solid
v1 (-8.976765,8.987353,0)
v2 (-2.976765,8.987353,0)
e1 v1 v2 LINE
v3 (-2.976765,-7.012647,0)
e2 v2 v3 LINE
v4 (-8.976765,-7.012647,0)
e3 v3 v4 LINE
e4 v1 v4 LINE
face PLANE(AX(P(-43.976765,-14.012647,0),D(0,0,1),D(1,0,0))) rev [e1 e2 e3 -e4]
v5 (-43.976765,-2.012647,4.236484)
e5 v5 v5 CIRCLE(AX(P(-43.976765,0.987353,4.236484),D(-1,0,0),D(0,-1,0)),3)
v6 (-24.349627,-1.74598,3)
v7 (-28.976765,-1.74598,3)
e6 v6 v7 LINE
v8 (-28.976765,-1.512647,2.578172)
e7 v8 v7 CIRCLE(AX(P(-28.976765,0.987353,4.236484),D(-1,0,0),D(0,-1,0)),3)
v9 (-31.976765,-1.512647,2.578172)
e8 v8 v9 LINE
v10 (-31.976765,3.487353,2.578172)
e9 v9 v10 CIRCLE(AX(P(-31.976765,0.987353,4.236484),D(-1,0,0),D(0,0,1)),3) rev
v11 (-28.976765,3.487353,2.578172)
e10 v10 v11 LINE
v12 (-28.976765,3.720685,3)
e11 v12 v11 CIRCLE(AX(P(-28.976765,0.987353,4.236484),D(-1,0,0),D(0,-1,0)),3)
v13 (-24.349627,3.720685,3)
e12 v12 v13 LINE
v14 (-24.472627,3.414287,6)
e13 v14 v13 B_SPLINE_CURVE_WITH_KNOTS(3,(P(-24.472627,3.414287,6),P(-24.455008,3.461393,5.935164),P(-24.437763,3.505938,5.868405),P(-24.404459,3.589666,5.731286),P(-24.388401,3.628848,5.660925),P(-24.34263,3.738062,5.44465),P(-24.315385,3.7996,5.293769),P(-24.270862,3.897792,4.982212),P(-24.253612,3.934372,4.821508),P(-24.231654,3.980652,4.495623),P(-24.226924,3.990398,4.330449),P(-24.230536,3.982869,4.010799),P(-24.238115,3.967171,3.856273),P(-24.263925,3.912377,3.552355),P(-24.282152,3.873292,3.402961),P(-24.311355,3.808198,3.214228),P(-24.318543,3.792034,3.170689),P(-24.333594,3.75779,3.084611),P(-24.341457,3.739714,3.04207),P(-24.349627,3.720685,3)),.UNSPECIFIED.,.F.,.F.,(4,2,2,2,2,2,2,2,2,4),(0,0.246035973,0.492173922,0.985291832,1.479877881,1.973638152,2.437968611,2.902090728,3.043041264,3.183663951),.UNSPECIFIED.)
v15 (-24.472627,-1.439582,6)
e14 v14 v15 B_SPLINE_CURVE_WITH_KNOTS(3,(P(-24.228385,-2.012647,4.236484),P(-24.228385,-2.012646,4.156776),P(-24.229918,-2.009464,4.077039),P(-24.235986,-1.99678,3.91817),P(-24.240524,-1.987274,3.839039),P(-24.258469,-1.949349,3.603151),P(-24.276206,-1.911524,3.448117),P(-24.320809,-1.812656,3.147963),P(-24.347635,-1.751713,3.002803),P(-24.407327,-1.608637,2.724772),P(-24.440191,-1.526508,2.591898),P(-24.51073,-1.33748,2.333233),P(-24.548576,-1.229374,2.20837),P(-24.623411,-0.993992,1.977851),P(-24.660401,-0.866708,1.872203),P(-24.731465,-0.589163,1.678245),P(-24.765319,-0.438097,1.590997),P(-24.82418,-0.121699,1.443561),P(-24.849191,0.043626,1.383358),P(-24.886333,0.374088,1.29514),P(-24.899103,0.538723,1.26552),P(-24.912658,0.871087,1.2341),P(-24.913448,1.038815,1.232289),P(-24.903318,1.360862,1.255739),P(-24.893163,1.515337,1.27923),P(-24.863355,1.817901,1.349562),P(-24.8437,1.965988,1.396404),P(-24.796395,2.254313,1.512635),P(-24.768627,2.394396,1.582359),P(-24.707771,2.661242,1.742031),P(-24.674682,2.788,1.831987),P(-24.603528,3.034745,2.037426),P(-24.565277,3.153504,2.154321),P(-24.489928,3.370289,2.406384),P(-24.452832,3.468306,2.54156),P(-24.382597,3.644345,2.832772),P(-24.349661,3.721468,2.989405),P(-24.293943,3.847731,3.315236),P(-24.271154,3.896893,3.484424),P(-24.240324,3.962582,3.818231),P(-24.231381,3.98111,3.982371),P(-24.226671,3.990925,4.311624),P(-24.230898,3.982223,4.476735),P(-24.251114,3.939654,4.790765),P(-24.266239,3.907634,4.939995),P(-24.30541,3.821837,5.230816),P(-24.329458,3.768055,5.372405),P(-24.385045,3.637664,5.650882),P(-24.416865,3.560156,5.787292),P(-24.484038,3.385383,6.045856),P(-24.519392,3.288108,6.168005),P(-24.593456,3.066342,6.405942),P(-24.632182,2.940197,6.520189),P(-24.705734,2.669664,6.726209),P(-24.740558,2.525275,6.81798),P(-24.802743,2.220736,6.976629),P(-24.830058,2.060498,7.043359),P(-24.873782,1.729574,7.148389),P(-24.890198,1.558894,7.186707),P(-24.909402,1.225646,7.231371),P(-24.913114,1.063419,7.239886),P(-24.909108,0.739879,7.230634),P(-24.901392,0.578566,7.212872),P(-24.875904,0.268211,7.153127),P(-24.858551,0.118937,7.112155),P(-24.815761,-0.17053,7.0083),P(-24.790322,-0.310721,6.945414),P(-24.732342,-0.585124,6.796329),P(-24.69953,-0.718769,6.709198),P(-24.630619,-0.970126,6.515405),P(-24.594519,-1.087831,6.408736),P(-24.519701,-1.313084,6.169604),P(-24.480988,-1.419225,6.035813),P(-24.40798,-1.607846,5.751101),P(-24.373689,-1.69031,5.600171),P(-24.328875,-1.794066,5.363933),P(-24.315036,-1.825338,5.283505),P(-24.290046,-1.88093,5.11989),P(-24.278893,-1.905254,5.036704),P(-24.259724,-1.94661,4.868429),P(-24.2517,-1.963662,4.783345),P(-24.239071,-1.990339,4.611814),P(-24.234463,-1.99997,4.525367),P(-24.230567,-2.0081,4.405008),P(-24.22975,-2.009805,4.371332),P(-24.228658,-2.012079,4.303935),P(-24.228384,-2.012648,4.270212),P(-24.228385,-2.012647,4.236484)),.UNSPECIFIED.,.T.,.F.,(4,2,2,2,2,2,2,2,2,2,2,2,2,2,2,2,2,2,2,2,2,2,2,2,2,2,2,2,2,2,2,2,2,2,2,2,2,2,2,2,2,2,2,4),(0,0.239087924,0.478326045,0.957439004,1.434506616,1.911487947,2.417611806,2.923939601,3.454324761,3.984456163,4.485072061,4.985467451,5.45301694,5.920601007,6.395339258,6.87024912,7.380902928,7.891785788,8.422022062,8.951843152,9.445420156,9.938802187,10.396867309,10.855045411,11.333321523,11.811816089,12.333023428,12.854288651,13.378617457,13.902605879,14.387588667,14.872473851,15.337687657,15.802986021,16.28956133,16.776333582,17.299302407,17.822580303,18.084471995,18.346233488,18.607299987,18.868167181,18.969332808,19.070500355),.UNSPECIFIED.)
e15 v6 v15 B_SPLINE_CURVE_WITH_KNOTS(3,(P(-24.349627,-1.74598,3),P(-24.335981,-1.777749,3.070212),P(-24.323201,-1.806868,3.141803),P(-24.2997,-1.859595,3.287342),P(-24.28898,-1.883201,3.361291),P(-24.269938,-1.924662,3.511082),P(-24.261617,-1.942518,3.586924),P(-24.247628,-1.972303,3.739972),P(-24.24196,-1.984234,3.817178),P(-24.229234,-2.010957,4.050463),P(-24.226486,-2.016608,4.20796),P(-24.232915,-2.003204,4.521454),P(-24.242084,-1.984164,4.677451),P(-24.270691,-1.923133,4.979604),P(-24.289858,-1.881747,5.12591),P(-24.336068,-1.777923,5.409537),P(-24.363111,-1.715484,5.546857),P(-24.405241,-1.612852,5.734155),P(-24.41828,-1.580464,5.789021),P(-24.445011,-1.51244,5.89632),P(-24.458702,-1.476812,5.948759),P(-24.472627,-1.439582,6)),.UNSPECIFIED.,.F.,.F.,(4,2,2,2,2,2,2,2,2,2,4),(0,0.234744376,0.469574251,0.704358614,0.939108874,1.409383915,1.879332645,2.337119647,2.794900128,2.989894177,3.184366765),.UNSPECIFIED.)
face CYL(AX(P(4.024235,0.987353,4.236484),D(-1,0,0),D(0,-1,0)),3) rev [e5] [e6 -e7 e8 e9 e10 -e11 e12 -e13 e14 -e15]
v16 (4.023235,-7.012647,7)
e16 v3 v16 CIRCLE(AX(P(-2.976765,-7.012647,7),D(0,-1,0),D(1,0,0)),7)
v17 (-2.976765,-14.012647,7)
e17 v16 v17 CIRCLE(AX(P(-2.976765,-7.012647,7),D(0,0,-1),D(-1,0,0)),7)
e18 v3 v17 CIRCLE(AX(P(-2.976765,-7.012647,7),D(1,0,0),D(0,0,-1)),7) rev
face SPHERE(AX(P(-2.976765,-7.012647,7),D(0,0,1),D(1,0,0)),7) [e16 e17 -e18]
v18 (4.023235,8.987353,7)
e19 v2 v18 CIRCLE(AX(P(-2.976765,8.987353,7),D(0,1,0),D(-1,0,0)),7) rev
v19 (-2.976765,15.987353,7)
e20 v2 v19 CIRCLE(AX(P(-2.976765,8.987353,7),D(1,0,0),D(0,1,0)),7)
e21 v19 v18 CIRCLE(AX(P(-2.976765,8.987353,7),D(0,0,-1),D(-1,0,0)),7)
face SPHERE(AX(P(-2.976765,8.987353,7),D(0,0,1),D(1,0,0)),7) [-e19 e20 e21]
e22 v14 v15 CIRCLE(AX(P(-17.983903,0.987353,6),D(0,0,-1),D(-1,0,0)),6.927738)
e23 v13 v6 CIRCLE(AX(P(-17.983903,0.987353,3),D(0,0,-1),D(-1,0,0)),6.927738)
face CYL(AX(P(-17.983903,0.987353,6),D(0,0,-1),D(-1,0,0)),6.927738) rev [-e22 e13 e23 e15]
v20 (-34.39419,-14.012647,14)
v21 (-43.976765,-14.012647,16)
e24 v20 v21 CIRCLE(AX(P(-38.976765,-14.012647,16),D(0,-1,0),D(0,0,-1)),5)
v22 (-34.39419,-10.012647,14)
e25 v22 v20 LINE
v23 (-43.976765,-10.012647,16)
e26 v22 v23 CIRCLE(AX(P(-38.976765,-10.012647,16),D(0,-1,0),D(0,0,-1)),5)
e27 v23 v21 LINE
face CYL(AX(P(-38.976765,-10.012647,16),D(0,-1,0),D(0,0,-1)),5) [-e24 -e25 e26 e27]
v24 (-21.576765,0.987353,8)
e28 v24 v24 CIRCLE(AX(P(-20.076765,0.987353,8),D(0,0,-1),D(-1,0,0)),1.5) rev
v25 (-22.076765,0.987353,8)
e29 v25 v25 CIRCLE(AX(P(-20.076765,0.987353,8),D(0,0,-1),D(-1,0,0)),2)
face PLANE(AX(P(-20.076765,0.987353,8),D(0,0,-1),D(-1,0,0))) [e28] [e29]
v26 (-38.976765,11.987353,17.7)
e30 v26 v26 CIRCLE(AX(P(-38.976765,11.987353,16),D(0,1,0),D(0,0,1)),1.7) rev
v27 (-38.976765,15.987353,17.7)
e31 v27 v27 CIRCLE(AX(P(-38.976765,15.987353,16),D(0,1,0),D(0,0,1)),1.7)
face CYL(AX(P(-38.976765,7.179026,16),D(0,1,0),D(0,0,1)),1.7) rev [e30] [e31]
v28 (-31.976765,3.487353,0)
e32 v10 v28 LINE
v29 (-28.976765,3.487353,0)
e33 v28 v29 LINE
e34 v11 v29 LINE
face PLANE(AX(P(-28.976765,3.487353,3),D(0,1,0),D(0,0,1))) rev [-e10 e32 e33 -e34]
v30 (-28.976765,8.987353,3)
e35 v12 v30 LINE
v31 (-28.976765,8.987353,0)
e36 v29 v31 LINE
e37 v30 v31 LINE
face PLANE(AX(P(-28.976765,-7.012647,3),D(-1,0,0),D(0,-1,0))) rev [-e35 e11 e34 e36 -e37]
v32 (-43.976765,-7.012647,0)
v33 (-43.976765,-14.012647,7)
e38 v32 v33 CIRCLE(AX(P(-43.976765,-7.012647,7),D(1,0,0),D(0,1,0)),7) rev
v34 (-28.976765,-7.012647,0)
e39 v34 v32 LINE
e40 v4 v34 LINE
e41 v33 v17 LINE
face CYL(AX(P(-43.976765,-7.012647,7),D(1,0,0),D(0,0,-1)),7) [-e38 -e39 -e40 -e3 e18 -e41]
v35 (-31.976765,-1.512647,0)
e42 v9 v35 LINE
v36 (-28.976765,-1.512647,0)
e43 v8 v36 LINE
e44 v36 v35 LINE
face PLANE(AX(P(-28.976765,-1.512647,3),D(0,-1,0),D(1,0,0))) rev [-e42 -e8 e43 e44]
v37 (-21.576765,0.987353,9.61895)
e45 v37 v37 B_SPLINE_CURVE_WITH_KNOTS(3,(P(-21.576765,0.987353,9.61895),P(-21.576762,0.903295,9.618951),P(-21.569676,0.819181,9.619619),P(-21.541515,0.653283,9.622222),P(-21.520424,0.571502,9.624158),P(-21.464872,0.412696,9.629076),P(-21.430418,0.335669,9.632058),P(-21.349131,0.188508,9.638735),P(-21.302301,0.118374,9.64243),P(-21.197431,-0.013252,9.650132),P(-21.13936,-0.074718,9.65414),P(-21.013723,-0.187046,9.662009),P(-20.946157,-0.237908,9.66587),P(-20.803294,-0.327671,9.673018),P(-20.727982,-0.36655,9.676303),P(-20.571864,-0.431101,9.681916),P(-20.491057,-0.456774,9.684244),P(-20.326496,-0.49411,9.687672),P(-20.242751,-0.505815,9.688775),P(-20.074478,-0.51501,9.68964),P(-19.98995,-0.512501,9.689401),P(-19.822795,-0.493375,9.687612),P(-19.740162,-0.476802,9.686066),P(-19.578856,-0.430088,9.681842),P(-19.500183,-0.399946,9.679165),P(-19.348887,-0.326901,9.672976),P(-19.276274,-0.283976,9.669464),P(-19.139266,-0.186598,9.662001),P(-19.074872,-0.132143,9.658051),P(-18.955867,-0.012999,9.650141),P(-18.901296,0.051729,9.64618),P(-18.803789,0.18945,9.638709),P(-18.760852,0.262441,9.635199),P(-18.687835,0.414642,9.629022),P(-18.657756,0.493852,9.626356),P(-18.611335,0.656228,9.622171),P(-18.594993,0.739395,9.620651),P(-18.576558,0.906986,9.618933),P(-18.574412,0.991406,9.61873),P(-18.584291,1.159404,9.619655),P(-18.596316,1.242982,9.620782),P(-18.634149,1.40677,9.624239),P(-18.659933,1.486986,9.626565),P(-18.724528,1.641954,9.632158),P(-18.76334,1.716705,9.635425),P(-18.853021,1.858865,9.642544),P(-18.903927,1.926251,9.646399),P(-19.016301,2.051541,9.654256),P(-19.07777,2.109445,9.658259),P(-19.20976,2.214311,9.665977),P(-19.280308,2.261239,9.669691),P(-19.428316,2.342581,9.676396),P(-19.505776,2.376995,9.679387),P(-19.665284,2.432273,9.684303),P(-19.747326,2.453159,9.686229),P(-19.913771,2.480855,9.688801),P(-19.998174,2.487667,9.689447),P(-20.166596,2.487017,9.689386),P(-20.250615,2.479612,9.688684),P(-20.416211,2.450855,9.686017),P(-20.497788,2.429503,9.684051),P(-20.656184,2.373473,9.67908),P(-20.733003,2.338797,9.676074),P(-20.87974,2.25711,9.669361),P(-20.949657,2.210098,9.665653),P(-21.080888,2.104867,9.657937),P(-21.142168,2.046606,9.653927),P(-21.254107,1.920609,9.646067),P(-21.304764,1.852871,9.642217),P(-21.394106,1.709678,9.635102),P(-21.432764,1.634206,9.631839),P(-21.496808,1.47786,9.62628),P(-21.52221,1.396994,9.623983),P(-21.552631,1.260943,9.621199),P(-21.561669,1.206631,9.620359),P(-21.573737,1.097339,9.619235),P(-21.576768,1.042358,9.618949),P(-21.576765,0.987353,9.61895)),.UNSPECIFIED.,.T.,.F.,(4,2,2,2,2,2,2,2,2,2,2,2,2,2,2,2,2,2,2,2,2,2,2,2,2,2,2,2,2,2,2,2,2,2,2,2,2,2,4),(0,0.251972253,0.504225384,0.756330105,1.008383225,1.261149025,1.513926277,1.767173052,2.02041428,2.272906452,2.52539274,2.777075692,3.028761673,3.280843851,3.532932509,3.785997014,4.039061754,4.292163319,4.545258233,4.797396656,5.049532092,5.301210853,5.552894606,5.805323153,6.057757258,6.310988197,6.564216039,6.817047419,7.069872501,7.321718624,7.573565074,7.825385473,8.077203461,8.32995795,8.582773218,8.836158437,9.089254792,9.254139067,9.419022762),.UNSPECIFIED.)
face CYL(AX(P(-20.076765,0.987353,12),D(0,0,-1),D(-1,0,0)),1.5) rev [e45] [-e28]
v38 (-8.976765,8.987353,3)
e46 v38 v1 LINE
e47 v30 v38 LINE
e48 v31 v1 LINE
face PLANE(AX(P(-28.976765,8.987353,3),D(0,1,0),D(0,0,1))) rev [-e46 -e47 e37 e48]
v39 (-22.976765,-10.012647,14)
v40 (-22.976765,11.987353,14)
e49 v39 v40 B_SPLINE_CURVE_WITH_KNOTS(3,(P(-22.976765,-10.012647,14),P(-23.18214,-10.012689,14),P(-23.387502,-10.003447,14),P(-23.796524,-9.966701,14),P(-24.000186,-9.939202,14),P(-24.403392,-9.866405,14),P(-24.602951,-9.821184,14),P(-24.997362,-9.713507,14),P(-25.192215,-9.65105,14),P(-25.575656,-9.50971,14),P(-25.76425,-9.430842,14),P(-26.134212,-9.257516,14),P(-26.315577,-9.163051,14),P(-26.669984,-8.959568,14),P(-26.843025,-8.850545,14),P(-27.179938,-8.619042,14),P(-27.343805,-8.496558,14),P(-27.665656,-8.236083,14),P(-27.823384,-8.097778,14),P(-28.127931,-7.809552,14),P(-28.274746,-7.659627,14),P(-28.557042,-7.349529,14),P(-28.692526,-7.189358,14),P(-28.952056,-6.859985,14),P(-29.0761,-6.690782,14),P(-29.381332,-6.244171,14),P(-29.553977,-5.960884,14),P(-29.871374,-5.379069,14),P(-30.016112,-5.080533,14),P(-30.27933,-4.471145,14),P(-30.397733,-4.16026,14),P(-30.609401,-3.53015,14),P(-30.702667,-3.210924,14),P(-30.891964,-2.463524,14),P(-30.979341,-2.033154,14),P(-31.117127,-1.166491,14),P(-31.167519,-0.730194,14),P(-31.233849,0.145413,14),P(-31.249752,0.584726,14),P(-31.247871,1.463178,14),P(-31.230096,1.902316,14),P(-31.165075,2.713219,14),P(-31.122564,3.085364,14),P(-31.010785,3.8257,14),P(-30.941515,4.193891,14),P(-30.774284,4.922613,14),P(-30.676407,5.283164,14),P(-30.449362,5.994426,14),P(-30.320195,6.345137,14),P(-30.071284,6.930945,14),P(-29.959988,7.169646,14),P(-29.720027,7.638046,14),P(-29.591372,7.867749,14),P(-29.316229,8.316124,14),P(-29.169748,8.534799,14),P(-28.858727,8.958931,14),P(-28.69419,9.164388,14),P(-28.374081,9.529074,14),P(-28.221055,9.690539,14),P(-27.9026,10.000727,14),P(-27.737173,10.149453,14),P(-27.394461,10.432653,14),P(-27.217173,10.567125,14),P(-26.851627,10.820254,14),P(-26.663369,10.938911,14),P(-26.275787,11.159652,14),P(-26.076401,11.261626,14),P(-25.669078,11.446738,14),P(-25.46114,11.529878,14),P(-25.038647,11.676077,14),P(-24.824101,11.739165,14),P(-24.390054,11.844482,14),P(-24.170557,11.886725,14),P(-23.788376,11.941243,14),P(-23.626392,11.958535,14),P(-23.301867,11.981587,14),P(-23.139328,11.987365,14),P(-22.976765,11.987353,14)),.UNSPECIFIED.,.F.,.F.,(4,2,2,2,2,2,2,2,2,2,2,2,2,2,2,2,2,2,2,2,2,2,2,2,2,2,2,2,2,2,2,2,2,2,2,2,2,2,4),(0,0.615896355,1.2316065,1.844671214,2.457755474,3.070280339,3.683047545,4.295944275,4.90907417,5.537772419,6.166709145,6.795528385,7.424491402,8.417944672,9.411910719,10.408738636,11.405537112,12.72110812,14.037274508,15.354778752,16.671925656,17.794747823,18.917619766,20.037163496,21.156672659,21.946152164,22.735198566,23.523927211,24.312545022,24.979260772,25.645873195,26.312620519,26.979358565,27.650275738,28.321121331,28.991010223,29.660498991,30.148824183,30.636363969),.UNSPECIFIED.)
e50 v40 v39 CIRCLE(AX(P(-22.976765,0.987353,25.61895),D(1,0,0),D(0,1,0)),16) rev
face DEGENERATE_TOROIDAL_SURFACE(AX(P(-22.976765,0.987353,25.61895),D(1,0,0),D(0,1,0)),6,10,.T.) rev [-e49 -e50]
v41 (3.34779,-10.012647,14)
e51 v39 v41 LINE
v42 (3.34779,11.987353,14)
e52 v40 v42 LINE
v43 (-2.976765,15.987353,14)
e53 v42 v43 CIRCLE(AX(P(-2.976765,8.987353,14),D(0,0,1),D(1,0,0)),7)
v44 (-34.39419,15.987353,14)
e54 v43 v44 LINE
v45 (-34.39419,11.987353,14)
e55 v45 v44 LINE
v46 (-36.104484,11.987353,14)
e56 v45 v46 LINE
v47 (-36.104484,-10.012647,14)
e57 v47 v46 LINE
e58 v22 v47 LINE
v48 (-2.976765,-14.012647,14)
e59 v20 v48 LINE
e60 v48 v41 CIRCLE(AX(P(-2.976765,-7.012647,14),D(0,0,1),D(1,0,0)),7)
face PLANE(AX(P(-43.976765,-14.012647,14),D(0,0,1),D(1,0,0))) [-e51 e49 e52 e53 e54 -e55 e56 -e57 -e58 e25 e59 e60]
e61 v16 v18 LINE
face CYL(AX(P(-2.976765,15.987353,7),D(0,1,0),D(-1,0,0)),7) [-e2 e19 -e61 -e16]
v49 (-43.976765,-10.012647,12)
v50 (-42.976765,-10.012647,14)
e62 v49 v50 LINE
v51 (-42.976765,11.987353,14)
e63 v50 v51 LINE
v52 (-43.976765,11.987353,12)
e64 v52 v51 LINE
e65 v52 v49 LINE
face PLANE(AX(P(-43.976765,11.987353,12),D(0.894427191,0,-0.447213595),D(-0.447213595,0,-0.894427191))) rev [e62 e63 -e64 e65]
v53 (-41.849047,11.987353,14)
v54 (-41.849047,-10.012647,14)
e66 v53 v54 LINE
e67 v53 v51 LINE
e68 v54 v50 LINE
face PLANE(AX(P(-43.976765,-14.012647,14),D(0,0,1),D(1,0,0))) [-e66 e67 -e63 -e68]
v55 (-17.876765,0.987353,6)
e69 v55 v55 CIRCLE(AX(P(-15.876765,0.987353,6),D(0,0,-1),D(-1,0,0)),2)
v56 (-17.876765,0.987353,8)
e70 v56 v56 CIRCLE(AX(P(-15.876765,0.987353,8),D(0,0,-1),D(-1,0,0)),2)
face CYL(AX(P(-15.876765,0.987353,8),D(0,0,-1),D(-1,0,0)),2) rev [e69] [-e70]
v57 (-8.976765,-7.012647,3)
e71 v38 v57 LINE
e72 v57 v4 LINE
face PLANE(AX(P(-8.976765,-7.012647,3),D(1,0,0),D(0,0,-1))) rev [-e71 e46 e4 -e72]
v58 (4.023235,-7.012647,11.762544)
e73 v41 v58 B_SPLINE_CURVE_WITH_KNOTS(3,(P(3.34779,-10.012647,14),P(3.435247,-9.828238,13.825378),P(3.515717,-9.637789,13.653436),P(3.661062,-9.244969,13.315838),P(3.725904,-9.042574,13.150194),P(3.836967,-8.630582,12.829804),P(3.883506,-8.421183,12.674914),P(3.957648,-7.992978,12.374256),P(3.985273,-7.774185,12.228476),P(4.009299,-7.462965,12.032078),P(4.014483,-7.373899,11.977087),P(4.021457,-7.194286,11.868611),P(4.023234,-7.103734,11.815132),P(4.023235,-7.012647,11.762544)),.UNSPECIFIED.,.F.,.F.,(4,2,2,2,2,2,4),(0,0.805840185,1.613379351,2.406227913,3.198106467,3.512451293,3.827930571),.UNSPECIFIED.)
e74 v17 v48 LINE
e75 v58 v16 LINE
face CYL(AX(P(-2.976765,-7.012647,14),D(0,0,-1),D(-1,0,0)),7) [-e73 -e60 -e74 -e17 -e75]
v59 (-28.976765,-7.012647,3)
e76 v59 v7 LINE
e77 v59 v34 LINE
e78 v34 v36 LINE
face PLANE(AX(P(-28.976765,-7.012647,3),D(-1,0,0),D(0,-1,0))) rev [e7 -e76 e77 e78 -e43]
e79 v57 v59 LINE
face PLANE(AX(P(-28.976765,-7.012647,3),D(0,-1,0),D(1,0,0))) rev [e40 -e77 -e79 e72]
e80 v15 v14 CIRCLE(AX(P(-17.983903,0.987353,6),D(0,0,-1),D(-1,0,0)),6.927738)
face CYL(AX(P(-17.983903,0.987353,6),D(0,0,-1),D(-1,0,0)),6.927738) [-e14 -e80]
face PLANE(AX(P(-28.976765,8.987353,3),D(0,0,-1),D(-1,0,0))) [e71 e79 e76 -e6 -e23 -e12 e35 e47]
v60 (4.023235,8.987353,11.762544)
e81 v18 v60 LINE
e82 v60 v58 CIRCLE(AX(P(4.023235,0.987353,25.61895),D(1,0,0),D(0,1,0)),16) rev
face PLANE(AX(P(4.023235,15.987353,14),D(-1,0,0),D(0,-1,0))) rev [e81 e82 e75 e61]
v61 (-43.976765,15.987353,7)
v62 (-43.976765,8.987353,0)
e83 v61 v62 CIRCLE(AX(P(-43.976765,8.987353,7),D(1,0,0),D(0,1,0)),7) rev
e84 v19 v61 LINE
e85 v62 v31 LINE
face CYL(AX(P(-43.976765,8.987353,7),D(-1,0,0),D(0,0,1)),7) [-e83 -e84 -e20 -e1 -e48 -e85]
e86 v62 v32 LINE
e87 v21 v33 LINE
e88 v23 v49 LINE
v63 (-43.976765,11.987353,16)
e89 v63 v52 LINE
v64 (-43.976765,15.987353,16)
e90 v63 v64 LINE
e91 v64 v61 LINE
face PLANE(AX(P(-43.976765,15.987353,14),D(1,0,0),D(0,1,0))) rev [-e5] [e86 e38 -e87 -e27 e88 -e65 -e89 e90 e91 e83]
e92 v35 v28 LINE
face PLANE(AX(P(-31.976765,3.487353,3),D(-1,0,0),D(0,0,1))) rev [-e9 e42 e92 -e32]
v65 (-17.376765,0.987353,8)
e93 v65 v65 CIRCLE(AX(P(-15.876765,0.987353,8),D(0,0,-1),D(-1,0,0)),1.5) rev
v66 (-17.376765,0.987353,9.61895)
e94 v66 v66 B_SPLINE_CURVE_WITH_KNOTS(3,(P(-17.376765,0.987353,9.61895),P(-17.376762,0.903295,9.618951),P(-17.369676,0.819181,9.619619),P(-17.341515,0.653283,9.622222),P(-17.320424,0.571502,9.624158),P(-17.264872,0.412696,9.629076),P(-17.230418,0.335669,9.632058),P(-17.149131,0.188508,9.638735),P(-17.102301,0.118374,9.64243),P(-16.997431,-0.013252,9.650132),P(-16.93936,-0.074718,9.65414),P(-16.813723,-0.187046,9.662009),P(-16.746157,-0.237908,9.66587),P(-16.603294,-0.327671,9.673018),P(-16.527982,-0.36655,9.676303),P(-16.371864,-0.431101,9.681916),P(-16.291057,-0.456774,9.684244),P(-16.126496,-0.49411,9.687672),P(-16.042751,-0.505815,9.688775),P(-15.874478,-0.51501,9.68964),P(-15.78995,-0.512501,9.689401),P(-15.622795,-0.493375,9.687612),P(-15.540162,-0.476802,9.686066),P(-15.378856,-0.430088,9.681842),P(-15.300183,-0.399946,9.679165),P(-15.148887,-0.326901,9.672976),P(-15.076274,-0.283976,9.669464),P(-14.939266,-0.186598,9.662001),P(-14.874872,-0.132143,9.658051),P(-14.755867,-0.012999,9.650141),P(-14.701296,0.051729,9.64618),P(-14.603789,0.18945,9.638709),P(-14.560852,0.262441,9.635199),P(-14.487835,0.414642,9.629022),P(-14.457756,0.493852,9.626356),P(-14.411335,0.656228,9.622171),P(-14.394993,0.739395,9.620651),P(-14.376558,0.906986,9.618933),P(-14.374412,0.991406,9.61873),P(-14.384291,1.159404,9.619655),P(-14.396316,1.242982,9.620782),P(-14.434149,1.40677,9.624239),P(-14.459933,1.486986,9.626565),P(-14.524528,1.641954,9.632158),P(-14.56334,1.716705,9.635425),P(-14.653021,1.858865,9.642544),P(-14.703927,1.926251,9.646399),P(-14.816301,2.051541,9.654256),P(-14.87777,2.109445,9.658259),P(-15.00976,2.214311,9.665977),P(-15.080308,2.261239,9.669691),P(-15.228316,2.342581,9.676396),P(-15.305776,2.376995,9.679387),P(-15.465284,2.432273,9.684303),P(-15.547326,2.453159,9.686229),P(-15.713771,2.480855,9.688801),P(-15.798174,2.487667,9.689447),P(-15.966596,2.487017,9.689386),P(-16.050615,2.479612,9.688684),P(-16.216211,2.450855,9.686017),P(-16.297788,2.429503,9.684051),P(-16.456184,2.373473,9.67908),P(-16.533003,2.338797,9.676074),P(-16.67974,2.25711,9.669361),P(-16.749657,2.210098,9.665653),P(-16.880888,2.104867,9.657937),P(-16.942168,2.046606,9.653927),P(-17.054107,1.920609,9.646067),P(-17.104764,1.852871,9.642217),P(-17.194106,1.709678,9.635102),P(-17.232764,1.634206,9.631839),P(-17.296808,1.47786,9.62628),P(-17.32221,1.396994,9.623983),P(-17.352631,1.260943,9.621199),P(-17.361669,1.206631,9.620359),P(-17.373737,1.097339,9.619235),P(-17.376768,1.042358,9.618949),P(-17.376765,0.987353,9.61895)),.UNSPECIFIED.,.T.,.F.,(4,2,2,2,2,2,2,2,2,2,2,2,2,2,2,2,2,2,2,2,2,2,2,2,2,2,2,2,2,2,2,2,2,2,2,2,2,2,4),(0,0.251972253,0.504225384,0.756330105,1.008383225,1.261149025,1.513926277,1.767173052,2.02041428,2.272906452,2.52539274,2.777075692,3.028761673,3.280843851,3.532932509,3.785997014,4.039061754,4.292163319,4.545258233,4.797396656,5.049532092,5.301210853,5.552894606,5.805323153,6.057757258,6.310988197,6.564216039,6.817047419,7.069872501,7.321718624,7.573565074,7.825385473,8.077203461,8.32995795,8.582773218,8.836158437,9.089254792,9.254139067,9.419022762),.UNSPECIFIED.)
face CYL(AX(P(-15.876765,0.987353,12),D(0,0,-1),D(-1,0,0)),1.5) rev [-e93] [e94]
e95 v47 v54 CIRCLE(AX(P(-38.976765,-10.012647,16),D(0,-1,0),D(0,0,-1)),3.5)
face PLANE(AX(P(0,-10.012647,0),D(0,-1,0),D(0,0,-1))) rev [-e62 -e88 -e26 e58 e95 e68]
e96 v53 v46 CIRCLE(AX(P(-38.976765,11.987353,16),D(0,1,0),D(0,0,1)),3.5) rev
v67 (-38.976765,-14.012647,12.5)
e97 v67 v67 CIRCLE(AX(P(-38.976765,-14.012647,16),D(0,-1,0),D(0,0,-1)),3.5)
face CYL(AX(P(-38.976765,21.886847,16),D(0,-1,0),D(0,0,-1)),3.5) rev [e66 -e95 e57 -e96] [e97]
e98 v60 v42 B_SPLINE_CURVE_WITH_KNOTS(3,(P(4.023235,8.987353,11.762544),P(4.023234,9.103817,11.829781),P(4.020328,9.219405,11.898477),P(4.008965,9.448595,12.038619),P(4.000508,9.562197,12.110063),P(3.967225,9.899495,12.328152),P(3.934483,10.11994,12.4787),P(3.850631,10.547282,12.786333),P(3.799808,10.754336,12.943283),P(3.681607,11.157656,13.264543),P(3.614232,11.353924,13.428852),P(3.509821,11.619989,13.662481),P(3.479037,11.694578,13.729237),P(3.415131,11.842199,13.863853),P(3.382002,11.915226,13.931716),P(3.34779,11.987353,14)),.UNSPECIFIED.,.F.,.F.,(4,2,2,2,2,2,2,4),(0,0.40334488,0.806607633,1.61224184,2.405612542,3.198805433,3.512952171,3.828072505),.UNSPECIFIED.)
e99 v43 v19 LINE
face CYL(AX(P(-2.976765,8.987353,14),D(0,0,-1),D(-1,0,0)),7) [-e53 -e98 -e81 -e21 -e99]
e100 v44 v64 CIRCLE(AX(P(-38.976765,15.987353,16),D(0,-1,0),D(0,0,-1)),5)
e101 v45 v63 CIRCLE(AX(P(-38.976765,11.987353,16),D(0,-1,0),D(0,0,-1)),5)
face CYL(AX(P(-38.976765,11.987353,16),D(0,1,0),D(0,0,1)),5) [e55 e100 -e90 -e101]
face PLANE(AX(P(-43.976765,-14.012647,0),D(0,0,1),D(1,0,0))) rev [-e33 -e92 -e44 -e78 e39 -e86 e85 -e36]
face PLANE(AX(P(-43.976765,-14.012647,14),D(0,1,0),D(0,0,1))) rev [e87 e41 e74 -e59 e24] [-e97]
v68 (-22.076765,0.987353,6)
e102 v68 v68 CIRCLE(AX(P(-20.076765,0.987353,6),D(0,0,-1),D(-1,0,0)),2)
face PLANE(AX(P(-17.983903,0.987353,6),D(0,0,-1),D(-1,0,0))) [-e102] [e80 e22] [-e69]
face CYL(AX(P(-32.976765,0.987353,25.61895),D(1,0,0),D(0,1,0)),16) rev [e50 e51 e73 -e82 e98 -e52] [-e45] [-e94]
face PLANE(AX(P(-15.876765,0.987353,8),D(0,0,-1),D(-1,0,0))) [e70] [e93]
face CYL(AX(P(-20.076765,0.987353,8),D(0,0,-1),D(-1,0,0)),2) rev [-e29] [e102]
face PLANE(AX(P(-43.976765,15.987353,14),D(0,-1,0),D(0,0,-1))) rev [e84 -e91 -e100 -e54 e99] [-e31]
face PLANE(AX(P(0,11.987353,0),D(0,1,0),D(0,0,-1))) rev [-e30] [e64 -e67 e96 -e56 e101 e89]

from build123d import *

# Parameters (mm, degrees)
CROQUIS1_W                  = 48
CROQUIS1_H                  = 30
SALIENTE_EXTRUIR1_DEPTH     = 14
CORTAR_EXTRUIR1_DEPTH       = 37
REDONDEO2_R                 = 7
CROQUIS3_W                  = 20
CROQUIS3_H                  = 16
CORTAR_EXTRUIR2_DEPTH       = 3
CROQUIS5_R                  = 1.5
CORTAR_EXTRUIR3_DEPTH       = 12
CROQUIS10_R                 = 6.927737764
CORTAR_EXTRUIR9_DEPTH       = 3
CORTAR_EXTRUIR10_REACH      = 54.494
CORTAR_EXTRUIR10_END_RADIUS = 6.927737764
CROQUIS11_R                 = 3
SALIENTE_EXTRUIR5_DEPTH     = 4
CORTAR_EXTRUIR14_REACH      = 59.227
CROQUIS12_R                 = 3.5
CORTAR_EXTRUIR16_DEPTH      = 22
CROQUIS16_R                 = 2
CORTAR_EXTRUIR17_DEPTH      = 2
CROQUIS17_W                 = 3
CROQUIS17_H                 = 5
CORTAR_EXTRUIR18_DEPTH      = 3
CROQUIS18_R                 = 1.7
CORTAR_EXTRUIR19_DEPTH      = 4
REDONDEO3_R                 = 10


with BuildPart() as part:
    # Croquis1 → Saliente-Extruir1 (new body)
    with BuildSketch(Plane.XY):
        with Locations((-19.976765257, 0.987352556)):
            Rectangle(CROQUIS1_W, CROQUIS1_H)
    extrude(amount=SALIENTE_EXTRUIR1_DEPTH)

    # Croquis2 → Cortar-Extruir1 (cut)
    with BuildSketch(Plane(origin=(4.023234743, 0, 0), x_dir=(0, 0, -1), z_dir=(1, 0, 0))):
        with BuildLine():
            ThreePointArc((-14, -10.012647444), (-9.618950039, 0.987352556), (-14, 11.987352556))
            Line((-14, 11.987352556), (-14, -10.012647444))
        make_face()
    extrude(amount=-CORTAR_EXTRUIR1_DEPTH, mode=Mode.SUBTRACT)

    # Redondeo2
    # the kernel refuses this fillet: 7 mm, written as the material it takes off along each edge
    with BuildSketch(Plane(origin=(-2.976765257, -7.012647444, 7), x_dir=(0, 0, -1), z_dir=(1, 0, 0))) as redondeo2_piece_1_section:
        Polygon((0, 0), (REDONDEO2_R, 0), (REDONDEO2_R, -REDONDEO2_R), (0, -REDONDEO2_R), align=None)
    redondeo2_piece_1 = extrude(amount=REDONDEO2_R, mode=Mode.PRIVATE)
    redondeo2_piece_1 = redondeo2_piece_1 - Plane(origin=(-2.976765257, -7.012647444, 7), x_dir=(0, 0.7071067811865475, 0.7071067811865475), z_dir=(1, 0, 0)) * Sphere(REDONDEO2_R, mode=Mode.PRIVATE)
    add(redondeo2_piece_1, mode=Mode.SUBTRACT)
    with BuildSketch(Plane(origin=(-2.976765257, 8.987352556, 7), x_dir=(1, 0, 0), z_dir=(0, 1, 0))) as redondeo2_piece_2_section:
        Polygon((0, 0), (REDONDEO2_R, 0), (REDONDEO2_R, REDONDEO2_R), (0, REDONDEO2_R), align=None)
    redondeo2_piece_2 = extrude(amount=REDONDEO2_R, mode=Mode.PRIVATE)
    redondeo2_piece_2 = redondeo2_piece_2 - Plane(origin=(-2.976765257, 8.987352556, 7), x_dir=(-0.7071067811865475, 0, 0.7071067811865475), z_dir=(0, 1, 0)) * Sphere(REDONDEO2_R, mode=Mode.PRIVATE)
    add(redondeo2_piece_2, mode=Mode.SUBTRACT)
    with BuildSketch(Plane(origin=(-2.976765257, -14.012647444, 0), x_dir=(0, 1, 0), z_dir=(-1, 0, 0))) as redondeo2_piece_3:
        with BuildLine():
            CenterArc((REDONDEO2_R, -REDONDEO2_R), REDONDEO2_R, 90, 90)
            Line((0, -REDONDEO2_R), (0, 0))
            Line((0, 0), (REDONDEO2_R, 0))
        make_face()
    extrude(amount=58.5, mode=Mode.SUBTRACT)
    with BuildSketch(Plane(origin=(4.023234743, 8.987352556, 0), x_dir=(0, 0, 1), z_dir=(0, -1, 0))) as redondeo2_piece_4:
        with BuildLine():
            CenterArc((REDONDEO2_R, REDONDEO2_R), REDONDEO2_R, 180, 90)
            Line((0, REDONDEO2_R), (0, 0))
            Line((0, 0), (REDONDEO2_R, 0))
        make_face()
    extrude(amount=16, mode=Mode.SUBTRACT)
    with BuildSketch(Plane(origin=(-61.476765257, 15.987352556, 0), x_dir=(0, 0, 1), z_dir=(1, 0, 0))) as redondeo2_piece_5:
        with BuildLine():
            CenterArc((REDONDEO2_R, REDONDEO2_R), REDONDEO2_R, 180, 90)
            Line((0, REDONDEO2_R), (0, 0))
            Line((0, 0), (REDONDEO2_R, 0))
        make_face()
    extrude(amount=58.5, mode=Mode.SUBTRACT)
    with BuildSketch(Plane(origin=(4.023234743, 15.987352556, 7), x_dir=(-1, 0, 0), z_dir=(0, 0, 1)), Plane(origin=(4.023234743, -14.012647444, 7), x_dir=(0, 1, 0), z_dir=(0, 0, 1))) as redondeo2_piece_6:
        with BuildLine():
            CenterArc((REDONDEO2_R, REDONDEO2_R), REDONDEO2_R, 180, 90)
            Line((0, REDONDEO2_R), (0, 0))
            Line((0, 0), (REDONDEO2_R, 0))
        make_face()
    extrude(amount=24.5, mode=Mode.SUBTRACT)

    # Croquis3 → Cortar-Extruir2 (cut)
    with BuildSketch(Plane(origin=(0, 0, 0), x_dir=(-1, 0, 0), z_dir=(0, 0, -1))):
        with Locations((18.976765257, 0.987352556)):
            Rectangle(CROQUIS3_W, CROQUIS3_H)
    extrude(amount=-CORTAR_EXTRUIR2_DEPTH, mode=Mode.SUBTRACT)

    # Croquis5 → Cortar-Extruir3 (cut)
    with BuildSketch(Plane(origin=(0, 0, 0), x_dir=(-1, 0, 0), z_dir=(0, 0, -1))):
        with Locations((20.076765257, 0.987352556)):
            Circle(CROQUIS5_R)
        with Locations((15.876765257, 0.987352556)):
            Circle(CROQUIS5_R)
    extrude(amount=-CORTAR_EXTRUIR3_DEPTH, mode=Mode.SUBTRACT)

    # Croquis10 → Cortar-Extruir9 (cut)
    with BuildSketch(Plane(origin=(0, 0, 3), x_dir=(-1, 0, 0), z_dir=(0, 0, -1))):
        with Locations((17.983902927, 0.987352556)):
            Circle(CROQUIS10_R)
    extrude(amount=-CORTAR_EXTRUIR9_DEPTH, mode=Mode.SUBTRACT)

    # Cortar-Extruir10: up to this cylinder (the profile starts outside it)
    cortar_extruir10_end = Plane(origin=(-17.983902927, 0.987352556, 4.236484), z_dir=(0, 0, -1)) * Cylinder(CORTAR_EXTRUIR10_END_RADIUS, 123.843475528, mode=Mode.PRIVATE)
    # Croquis11 → Cortar-Extruir10 (cut, up to the surface)
    with BuildSketch(Plane.ZY.offset(43.976765257), mode=Mode.PRIVATE) as cortar_extruir10_sk1:
        with Locations(Location((4.236484056, 0.987352556, 0), (0, 0, 270))):
            Circle(CROQUIS11_R)
    cortar_extruir10_tool1 = extrude(cortar_extruir10_sk1.sketch, amount=-CORTAR_EXTRUIR10_REACH, mode=Mode.PRIVATE) - cortar_extruir10_end
    add(cortar_extruir10_tool1.solids().sort_by_distance((-43.976765, 0.987353, 4.236484))[0], mode=Mode.SUBTRACT)

    # Croquis14 → Saliente-Extruir5 (add)
    with BuildSketch(Plane.XZ.offset(14.012647444)):
        with BuildLine():
            ThreePointArc((-33.976765257, 16), (-38.976765257, 21), (-43.976765257, 16))
            ThreePointArc((-43.976765257, 16), (-43.871296822, 14.978451782), (-43.559340952, 14))
            Line((-43.559340952, 14), (-34.394189562, 14))
            ThreePointArc((-34.394189562, 14), (-34.082233692, 14.978451782), (-33.976765257, 16))
        make_face()
        with BuildLine():
            Line((-34.394189562, 14), (-43.559340952, 14))
            ThreePointArc((-43.559340952, 14), (-38.976765257, 11), (-34.394189562, 14))
        make_face()
        with BuildLine():
            ThreePointArc((-43.559340952, 14), (-43.871296822, 14.978451782), (-43.976765257, 16))
            Line((-43.976765257, 16), (-43.976765257, 14))
            Line((-43.976765257, 14), (-43.559340952, 14))
        make_face()
    saliente_extruir5 = extrude(amount=-SALIENTE_EXTRUIR5_DEPTH)

    # Simetría1: Saliente-Extruir5 across plane
    add(saliente_extruir5.mirror(Plane.ZX.offset(0.987352556)))

    # Cortar-Extruir14: up to this face of the body (flat: up to its plane)
    cortar_extruir14_end = Plane(part.part.faces().sort_by_distance((-38.999365489, 11.987352556, 17.080483699))[0])
    # Croquis12 → Cortar-Extruir14 (cut, up to the picked face)
    with BuildSketch(Plane.XZ.offset(14.012647444), mode=Mode.PRIVATE) as cortar_extruir14_sk1:
        with Locations(Location((-38.976765257, 16, 0), (0, 0, 270))):
            Circle(CROQUIS12_R)
    cortar_extruir14_tool1 = split(extrude(cortar_extruir14_sk1.sketch, amount=-CORTAR_EXTRUIR14_REACH, mode=Mode.PRIVATE), bisect_by=cortar_extruir14_end, keep=Keep.BOTH, mode=Mode.PRIVATE)
    add(cortar_extruir14_tool1.solids().sort_by(Axis((-38.976765, -14.012647, 16), (0, 1, 0)))[0], mode=Mode.SUBTRACT)

    # Croquis15 → Cortar-Extruir16 (cut)
    with BuildSketch(Plane.XZ.offset(10.012647444)):
        Polygon((-43.976765257, 16), (-43.976765257, 12), (-41.976765257, 16), align=None)
    extrude(amount=-CORTAR_EXTRUIR16_DEPTH, mode=Mode.SUBTRACT)

    # Croquis16 → Cortar-Extruir17 (cut)
    with BuildSketch(Plane(origin=(0, 0, 6), x_dir=(-1, 0, 0), z_dir=(0, 0, -1))):
        with Locations((15.876765257, 0.987352556)):
            Circle(CROQUIS16_R)
        with Locations((20.076765257, 0.987352556)):
            Circle(CROQUIS16_R)
    extrude(amount=-CORTAR_EXTRUIR17_DEPTH, mode=Mode.SUBTRACT)

    # Croquis17 → Cortar-Extruir18 (cut)
    with BuildSketch(Plane(origin=(0, 0, 0), x_dir=(-1, 0, 0), z_dir=(0, 0, -1))):
        with Locations((30.476765257, 0.987352556)):
            Rectangle(CROQUIS17_W, CROQUIS17_H)
    extrude(amount=-CORTAR_EXTRUIR18_DEPTH, mode=Mode.SUBTRACT)

    # Croquis18 → Cortar-Extruir19 (cut)
    with BuildSketch(Plane(origin=(0, 15.987352556, 0), x_dir=(1, 0, 0), z_dir=(0, 1, 0))):
        with Locations(Location((-38.976765257, -16, 0), (0, 0, 270))):
            Circle(CROQUIS18_R)
    extrude(amount=-CORTAR_EXTRUIR19_DEPTH, mode=Mode.SUBTRACT)

    # Redondeo3
    # the kernel refuses this fillet: 10 mm, written as the material it adds along each edge
    with BuildSketch(Plane(origin=(-32.976765257, 0.987352556, 25.618950039), x_dir=(0, -0.7314644805706508, 0.6818795448343558), z_dir=(0, 0.6818795448343558, 0.7314644805706508))) as redondeo3_piece_1_section:
        with BuildLine():
            CenterArc((16 - REDONDEO3_R, REDONDEO3_R), REDONDEO3_R, 270, 90)
            Line((16 - REDONDEO3_R, 0), (16, 0))
            Line((16, 0), (16, REDONDEO3_R))
        make_face()
    redondeo3_piece_1 = revolve(axis=Axis((-32.976765257, 0.987352556, 25.618950039), (1, 0, 0)), revolution_arc=265.981384943, mode=Mode.PRIVATE)
    redondeo3_piece_1 = split(redondeo3_piece_1, bisect_by=Plane(origin=(-29.991953526, 0.987352592, 14), z_dir=(0, 0, -1)), keep=Keep.TOP, mode=Mode.PRIVATE)
    add(redondeo3_piece_1)


solid = part.part
